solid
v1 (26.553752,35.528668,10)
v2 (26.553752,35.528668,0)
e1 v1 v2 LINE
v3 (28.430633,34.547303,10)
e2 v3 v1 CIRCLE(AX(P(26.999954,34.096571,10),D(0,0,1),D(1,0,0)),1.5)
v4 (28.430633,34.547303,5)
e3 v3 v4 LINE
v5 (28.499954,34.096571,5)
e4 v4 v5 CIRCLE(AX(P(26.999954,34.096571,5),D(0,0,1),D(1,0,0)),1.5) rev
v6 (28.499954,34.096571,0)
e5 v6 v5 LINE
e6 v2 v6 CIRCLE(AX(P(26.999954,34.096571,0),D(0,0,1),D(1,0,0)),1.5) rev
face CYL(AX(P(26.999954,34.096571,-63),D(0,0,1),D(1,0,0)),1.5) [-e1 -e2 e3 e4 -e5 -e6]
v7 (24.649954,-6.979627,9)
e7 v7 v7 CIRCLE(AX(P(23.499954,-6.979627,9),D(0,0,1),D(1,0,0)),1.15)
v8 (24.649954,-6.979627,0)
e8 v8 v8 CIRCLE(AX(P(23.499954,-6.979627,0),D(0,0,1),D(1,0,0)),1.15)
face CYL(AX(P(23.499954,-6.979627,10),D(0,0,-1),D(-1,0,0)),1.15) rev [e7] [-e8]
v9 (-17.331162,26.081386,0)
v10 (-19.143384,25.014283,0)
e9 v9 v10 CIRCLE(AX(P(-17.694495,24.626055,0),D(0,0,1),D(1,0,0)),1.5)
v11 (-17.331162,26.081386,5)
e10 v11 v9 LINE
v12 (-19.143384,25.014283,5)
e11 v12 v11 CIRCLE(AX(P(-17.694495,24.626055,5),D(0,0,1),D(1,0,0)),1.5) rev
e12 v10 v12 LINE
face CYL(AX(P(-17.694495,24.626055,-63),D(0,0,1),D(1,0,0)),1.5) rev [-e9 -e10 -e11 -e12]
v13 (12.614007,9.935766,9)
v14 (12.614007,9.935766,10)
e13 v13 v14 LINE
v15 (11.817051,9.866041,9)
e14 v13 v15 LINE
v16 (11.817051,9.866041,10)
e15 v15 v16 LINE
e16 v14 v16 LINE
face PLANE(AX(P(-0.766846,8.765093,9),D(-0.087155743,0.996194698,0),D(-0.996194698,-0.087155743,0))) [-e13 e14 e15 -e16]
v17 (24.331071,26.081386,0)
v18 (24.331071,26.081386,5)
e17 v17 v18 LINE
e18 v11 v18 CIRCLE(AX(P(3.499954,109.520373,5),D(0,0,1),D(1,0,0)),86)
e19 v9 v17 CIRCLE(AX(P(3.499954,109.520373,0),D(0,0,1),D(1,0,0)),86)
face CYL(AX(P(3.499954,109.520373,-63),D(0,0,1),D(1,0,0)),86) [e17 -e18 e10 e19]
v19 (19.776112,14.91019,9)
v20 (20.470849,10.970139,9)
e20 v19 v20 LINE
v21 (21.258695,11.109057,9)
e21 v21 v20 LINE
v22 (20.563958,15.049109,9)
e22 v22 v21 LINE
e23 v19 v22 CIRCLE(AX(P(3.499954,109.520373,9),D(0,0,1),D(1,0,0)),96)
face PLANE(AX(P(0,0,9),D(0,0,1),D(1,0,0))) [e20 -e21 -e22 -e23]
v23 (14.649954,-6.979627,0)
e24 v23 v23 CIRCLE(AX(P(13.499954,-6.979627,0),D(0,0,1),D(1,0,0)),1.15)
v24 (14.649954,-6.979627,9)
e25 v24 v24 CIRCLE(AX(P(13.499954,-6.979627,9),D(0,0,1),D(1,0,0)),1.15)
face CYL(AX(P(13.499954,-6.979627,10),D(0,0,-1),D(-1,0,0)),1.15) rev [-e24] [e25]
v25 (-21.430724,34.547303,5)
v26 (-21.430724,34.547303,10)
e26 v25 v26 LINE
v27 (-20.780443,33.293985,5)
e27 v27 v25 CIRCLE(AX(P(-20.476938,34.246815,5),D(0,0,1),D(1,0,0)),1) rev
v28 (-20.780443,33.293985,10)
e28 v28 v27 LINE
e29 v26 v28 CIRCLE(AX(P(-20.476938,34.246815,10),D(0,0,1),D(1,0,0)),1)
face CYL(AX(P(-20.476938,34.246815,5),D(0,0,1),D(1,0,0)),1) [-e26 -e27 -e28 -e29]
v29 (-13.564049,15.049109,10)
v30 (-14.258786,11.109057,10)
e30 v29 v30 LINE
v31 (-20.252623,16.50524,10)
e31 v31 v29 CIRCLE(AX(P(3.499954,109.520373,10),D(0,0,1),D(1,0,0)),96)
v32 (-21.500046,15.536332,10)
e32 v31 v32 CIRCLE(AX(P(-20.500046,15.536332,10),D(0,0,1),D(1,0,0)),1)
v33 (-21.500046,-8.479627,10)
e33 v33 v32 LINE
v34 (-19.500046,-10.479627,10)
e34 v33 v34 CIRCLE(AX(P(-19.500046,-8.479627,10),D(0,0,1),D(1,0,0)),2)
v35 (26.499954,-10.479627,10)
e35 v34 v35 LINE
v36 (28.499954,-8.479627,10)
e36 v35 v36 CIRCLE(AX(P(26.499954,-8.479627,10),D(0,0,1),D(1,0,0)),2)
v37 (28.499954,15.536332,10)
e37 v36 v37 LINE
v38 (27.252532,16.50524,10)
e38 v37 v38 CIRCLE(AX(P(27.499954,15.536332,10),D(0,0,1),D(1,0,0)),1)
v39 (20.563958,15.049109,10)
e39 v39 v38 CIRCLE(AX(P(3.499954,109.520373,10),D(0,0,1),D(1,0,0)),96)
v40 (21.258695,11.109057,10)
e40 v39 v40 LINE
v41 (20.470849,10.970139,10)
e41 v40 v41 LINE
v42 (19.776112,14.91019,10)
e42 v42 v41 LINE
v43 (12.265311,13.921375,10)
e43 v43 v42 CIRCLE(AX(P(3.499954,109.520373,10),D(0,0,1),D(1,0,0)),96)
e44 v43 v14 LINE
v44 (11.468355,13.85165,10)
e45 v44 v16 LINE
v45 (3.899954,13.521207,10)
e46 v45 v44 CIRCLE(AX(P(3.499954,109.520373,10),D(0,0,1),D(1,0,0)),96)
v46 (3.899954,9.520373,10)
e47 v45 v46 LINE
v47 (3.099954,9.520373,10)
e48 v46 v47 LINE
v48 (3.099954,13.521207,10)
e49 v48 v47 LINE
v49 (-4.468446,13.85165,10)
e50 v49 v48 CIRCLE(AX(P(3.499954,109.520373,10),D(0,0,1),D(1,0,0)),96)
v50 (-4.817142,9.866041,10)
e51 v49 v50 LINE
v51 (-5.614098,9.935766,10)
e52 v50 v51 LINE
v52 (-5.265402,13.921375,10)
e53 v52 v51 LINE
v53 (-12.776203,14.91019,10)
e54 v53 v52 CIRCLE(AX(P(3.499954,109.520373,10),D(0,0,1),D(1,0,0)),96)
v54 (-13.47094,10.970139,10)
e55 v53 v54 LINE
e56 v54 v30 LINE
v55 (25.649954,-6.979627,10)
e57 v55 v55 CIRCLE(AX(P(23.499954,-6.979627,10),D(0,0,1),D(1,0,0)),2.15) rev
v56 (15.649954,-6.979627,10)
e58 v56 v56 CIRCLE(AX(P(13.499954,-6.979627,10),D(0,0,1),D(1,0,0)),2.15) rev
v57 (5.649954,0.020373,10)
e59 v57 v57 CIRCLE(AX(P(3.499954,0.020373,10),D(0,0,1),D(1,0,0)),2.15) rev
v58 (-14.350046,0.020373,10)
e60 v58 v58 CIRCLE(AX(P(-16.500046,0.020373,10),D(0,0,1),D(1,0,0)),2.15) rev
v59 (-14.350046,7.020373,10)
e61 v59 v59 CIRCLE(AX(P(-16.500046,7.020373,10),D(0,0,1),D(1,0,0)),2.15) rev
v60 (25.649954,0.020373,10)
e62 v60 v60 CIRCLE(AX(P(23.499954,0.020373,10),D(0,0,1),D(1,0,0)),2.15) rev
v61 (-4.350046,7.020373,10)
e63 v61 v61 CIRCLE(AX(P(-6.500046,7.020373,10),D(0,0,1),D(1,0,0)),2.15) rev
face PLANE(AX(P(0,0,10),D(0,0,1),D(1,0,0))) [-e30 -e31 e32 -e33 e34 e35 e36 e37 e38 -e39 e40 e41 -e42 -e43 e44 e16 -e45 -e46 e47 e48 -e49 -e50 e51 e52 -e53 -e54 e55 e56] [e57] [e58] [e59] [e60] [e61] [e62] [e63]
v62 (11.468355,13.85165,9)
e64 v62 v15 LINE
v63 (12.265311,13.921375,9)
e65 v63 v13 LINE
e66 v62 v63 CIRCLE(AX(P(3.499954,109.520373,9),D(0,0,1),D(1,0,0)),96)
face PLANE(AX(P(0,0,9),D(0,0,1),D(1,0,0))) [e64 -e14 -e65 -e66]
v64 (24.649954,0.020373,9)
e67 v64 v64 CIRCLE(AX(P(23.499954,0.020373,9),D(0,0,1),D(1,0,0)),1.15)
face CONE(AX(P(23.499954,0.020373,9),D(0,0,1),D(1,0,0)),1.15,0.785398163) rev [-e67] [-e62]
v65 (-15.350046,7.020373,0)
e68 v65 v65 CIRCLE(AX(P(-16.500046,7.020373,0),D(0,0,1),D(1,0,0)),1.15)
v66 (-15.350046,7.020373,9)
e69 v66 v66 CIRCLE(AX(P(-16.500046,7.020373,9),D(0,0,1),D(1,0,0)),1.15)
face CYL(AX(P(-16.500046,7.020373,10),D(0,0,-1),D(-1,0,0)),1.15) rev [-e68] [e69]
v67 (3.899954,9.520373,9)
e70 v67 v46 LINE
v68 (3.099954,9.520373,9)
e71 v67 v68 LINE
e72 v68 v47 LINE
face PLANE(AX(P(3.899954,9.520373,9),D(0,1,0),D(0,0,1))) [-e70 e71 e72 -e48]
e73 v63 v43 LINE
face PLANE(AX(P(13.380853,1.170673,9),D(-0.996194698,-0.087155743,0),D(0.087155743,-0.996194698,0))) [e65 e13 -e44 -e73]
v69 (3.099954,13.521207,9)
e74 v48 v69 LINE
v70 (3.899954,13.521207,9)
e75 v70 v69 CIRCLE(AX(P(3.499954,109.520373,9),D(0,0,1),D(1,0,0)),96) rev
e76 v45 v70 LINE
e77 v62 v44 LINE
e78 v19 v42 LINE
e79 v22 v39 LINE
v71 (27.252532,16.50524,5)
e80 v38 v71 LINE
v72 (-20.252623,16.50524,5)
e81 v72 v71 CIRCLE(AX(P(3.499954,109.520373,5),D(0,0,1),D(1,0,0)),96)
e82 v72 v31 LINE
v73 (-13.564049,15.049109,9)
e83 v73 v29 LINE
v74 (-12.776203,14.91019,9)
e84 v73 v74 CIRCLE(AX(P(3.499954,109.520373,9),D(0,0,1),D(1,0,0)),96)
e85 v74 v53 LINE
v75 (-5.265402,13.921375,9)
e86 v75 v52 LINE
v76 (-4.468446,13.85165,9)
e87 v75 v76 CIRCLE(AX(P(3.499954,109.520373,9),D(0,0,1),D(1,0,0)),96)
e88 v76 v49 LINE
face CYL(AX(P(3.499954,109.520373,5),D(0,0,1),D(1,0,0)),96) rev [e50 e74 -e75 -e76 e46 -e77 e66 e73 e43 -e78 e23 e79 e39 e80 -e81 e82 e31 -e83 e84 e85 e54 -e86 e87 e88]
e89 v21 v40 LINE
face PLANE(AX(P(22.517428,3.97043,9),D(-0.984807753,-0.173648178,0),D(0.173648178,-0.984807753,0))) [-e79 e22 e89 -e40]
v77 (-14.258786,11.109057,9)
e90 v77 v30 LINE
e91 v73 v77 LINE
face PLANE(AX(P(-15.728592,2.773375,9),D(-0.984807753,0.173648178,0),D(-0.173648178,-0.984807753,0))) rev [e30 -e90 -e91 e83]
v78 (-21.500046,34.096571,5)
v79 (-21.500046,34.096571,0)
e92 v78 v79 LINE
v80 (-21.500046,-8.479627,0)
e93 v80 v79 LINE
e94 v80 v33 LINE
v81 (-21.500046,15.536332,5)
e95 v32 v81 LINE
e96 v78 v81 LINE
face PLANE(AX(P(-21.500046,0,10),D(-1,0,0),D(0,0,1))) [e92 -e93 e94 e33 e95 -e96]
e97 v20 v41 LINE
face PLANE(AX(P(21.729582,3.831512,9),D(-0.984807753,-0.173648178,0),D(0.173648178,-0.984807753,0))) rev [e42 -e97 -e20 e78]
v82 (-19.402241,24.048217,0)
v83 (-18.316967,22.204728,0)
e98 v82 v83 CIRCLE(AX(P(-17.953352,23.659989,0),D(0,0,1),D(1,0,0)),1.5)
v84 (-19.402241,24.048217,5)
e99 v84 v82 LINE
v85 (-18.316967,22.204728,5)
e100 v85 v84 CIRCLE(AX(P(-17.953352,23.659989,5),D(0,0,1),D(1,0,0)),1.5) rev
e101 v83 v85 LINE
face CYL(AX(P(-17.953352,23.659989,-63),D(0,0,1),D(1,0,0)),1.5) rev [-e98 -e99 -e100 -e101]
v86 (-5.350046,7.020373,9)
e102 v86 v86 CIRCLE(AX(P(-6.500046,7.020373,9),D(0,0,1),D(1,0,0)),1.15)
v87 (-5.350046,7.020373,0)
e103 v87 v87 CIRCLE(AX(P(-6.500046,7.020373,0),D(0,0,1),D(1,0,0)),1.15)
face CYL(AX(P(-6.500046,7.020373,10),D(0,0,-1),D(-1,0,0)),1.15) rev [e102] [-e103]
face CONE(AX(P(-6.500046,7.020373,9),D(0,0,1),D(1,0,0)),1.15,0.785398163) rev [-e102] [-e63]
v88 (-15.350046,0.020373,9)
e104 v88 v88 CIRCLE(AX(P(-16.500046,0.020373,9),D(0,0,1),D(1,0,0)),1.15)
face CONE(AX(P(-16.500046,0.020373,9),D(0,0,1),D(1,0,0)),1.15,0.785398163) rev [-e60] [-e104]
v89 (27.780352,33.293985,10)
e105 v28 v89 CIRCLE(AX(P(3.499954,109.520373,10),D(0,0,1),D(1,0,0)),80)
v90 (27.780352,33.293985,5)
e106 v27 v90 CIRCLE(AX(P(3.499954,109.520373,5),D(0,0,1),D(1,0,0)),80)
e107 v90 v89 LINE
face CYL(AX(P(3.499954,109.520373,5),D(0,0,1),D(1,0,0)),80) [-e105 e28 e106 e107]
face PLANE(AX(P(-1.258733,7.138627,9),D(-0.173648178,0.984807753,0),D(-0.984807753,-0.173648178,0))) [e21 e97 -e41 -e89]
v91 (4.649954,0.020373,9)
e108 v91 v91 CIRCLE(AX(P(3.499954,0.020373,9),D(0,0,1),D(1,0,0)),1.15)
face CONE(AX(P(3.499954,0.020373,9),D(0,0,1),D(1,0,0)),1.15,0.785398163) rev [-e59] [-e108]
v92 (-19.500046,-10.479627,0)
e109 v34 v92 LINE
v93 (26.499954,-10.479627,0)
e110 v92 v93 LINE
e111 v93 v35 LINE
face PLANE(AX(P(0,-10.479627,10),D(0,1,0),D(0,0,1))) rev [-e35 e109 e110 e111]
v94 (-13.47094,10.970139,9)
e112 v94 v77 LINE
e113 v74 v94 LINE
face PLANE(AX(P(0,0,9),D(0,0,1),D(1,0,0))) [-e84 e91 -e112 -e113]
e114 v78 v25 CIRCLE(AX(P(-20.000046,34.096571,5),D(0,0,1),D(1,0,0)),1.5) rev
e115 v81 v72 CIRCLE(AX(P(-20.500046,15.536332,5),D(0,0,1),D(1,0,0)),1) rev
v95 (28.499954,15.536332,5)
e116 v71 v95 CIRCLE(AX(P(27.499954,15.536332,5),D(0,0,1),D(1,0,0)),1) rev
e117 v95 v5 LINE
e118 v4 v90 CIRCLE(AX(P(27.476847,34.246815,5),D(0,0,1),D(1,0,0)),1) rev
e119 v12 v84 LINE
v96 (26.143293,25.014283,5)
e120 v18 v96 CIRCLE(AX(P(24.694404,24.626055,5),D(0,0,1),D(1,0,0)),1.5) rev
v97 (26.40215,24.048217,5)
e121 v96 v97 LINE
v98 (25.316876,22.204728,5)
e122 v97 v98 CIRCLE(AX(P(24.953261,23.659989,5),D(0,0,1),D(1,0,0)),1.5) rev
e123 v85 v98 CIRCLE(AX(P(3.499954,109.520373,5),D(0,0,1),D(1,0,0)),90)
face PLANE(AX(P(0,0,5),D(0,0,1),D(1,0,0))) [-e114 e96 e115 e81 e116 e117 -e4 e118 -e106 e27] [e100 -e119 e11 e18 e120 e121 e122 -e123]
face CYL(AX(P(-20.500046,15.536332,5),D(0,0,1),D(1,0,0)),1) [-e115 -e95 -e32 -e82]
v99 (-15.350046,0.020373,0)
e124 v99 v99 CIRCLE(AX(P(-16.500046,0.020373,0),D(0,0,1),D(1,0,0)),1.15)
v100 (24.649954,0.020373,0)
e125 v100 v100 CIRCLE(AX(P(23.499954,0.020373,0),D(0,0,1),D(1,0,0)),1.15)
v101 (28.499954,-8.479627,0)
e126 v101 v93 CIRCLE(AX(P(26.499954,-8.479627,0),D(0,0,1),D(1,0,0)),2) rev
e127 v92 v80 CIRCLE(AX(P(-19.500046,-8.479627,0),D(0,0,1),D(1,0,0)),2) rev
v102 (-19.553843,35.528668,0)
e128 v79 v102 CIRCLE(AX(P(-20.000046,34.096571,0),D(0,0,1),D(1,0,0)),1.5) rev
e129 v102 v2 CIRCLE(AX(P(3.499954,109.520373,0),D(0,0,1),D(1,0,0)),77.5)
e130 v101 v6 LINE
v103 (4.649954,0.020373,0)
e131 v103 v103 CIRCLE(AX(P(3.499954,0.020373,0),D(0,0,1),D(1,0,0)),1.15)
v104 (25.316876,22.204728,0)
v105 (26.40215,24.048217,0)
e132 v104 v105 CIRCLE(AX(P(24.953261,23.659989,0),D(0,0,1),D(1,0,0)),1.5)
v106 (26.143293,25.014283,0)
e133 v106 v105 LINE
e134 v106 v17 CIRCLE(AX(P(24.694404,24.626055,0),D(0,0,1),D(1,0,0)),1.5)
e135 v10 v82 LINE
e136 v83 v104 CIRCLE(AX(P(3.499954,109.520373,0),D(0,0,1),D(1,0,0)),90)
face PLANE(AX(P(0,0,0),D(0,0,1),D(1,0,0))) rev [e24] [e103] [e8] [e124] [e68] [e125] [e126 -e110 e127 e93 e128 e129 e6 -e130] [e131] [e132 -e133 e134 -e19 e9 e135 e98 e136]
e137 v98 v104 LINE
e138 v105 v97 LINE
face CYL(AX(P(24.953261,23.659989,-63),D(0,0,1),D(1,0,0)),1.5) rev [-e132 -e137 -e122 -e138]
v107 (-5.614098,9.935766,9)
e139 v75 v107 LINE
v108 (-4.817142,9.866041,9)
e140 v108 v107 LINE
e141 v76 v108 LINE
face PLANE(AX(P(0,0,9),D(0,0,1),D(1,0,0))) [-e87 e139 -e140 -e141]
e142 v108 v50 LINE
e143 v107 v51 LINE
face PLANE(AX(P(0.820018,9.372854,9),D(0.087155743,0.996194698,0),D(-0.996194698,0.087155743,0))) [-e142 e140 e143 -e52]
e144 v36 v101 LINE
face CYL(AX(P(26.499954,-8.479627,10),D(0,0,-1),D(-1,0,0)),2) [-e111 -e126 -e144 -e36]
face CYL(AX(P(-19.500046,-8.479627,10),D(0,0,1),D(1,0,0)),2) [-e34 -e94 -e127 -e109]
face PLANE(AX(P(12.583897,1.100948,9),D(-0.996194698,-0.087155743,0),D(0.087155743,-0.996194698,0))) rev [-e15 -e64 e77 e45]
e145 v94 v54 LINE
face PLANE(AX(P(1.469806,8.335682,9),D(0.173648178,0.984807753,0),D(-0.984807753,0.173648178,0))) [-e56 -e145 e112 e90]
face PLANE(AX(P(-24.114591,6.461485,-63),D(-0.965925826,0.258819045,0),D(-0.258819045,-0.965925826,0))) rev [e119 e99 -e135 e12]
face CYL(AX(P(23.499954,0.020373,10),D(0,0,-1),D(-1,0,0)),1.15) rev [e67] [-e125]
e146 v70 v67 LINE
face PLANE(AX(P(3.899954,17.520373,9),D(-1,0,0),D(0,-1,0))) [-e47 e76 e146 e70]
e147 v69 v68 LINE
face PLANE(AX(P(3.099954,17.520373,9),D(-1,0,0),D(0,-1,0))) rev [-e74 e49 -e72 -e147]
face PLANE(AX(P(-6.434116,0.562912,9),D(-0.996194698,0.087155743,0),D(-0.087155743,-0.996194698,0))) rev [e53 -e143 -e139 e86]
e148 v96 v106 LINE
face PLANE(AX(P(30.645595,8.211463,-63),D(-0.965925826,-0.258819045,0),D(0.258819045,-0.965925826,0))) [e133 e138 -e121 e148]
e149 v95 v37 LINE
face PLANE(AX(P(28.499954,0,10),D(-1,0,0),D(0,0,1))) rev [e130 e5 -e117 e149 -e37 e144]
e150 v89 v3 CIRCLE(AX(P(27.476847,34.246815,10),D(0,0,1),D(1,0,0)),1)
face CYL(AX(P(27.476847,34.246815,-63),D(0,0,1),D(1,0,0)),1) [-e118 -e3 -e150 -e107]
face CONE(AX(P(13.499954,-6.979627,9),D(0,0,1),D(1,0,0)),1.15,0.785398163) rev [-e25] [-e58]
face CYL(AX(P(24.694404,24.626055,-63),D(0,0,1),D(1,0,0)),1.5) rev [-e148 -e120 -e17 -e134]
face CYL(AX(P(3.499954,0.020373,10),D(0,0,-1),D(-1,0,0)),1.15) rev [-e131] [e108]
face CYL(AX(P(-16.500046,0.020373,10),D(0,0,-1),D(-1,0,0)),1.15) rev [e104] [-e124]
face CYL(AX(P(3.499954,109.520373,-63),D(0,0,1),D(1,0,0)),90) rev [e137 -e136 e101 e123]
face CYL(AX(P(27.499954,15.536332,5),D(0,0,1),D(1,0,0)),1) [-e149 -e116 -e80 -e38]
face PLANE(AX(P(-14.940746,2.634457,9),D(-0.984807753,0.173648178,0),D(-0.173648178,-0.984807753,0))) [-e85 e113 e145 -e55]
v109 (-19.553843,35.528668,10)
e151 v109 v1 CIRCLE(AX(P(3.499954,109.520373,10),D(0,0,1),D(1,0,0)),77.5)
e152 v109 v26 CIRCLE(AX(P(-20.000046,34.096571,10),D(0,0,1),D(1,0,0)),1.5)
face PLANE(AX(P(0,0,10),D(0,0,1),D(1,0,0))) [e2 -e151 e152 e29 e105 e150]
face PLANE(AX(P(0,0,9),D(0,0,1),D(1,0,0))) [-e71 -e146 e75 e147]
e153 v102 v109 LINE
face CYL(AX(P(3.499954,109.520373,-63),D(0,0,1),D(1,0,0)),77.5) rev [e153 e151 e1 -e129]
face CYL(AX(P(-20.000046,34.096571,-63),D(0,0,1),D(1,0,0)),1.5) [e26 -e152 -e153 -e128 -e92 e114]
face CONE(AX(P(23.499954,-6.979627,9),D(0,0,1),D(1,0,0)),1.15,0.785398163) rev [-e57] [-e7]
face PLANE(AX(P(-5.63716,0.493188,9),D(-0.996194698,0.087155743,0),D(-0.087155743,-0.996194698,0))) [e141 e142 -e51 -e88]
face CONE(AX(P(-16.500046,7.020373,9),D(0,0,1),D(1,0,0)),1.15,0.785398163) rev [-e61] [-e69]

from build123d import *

# Parameters (mm, degrees)
SKETCH1_W           = 50
SKETCH1_H           = 21
SKETCH1_R           = 1.15
BOSS_EXTRUDE4_DEPTH = 10
CHAMFER2_SIZE       = 1
FILLET2_R           = 2
SKETCH2_W           = 50
SKETCH2_H           = 10
BOSS_EXTRUDE5_DEPTH = 40
CUT_EXTRUDE1_DEPTH  = 73
CUT_EXTRUDE2_DEPTH  = 5
CUT_EXTRUDE3_DEPTH  = 1
FILLET4_R           = 1.5
FILLET6_R           = 1.5
FILLET7_R           = 1


with BuildPart() as part:
    # Sketch1 → Boss-Extrude4 (new body)
    with BuildSketch(Plane.XY):
        with Locations((3.499954481, 0.020373254)):
            Rectangle(SKETCH1_W, SKETCH1_H)
        with Locations((-16.500045519, 0.020373254)):
            Circle(SKETCH1_R, mode=Mode.SUBTRACT)
        with Locations((13.499954481, -6.979626746)):
            Circle(SKETCH1_R, mode=Mode.SUBTRACT)
        with Locations((23.499954481, -6.979626746)):
            Circle(SKETCH1_R, mode=Mode.SUBTRACT)
        with Locations((-16.500045519, 7.020373254)):
            Circle(SKETCH1_R, mode=Mode.SUBTRACT)
        with Locations((-6.500045519, 7.020373254)):
            Circle(SKETCH1_R, mode=Mode.SUBTRACT)
        with Locations((3.499954481, 0.020373254)):
            Circle(SKETCH1_R, mode=Mode.SUBTRACT)
        with Locations((23.499954481, 0.020373254)):
            Circle(SKETCH1_R, mode=Mode.SUBTRACT)
    extrude(amount=BOSS_EXTRUDE4_DEPTH)

    # Chamfer2
    chamfer2_edges = [part.edges().sort_by_distance(p)[0] for p in [
        (22.349954481, 0.020373254, 10),
        (-17.650045519, 0.020373254, 10),
        (-17.650045519, 7.020373254, 10),
        (-7.650045519, 7.020373254, 10),
        (22.349954481, -6.979626746, 10),
        (12.349954481, -6.979626746, 10),
        (2.349954481, 0.020373254, 10),
    ]]
    chamfer(chamfer2_edges, length=CHAMFER2_SIZE)

    # Fillet2
    fillet2_edges = [part.edges().sort_by_distance(p)[0] for p in [
        (28.499954481, -10.479626746, 5),
        (-21.500045519, -10.479626746, 5),
    ]]
    fillet(fillet2_edges, radius=FILLET2_R)

    # Sketch2 → Boss-Extrude5 (add)
    with BuildSketch(Plane(origin=(0, 10.520373254, 0), x_dir=(1, 0, 0), z_dir=(0, 1, 0))):
        with Locations((3.499954481, -5)):
            Rectangle(SKETCH2_W, SKETCH2_H)
    extrude(amount=BOSS_EXTRUDE5_DEPTH)

    # Sketch4 → Cut-Extrude1 (cut)
    with BuildSketch(Plane.XY.offset(10)):
        with BuildLine():
            Line((26.79366854, 22.587048888), (25.75839236, 26.450752193))
            ThreePointArc((25.75839236, 26.450752193), (3.499954481, 23.520373254), (-18.758483398, 26.450752193))
            Line((-18.758483398, 26.450752193), (-19.793759578, 22.587048888))
            ThreePointArc((-19.793759578, 22.587048888), (3.499954481, 19.520373254), (26.79366854, 22.587048888))
        make_face()
        with BuildLine():
            ThreePointArc((-21.500045519, 36.163369499), (3.499954481, 32.020373254), (28.499954481, 36.163369499))
            Line((28.499954481, 36.163369499), (28.499954481, 50.520373254))
            Line((28.499954481, 50.520373254), (-21.500045519, 50.520373254))
            Line((-21.500045519, 50.520373254), (-21.500045519, 36.163369499))
        make_face()
    extrude(amount=-CUT_EXTRUDE1_DEPTH, mode=Mode.SUBTRACT)

    # Sketch4<3> → Cut-Extrude2 (cut)
    with BuildSketch(Plane.XY.offset(10)):
        with BuildLine():
            Line((28.499954481, 17.764584387), (28.499954481, 23.062290925))
            ThreePointArc((28.499954481, 23.062290925), (27.647980656, 22.820472263), (26.79366854, 22.587048888))
            ThreePointArc((26.79366854, 22.587048888), (3.499954481, 19.520373254), (-19.793759578, 22.587048888))
            ThreePointArc((-19.793759578, 22.587048888), (-20.648071694, 22.820472263), (-21.500045519, 23.062290925))
            Line((-21.500045519, 23.062290925), (-21.500045519, 17.764584387))
            Line((-21.500045519, 17.764584387), (-20.697767999, 20.758724854))
            Line((-20.697767999, 20.758724854), (-19.925027338, 20.551669618))
            Line((-19.925027338, 20.551669618), (-20.960087835, 16.688771254))
            ThreePointArc((-20.960087835, 16.688771254), (-17.278248457, 15.795956571), (-13.564048969, 15.049108913))
            Line((-13.564048969, 15.049108913), (-12.869600966, 18.987519248))
            Line((-12.869600966, 18.987519248), (-12.081754763, 18.848600706))
            Line((-12.081754763, 18.848600706), (-12.776202766, 14.910190371))
            ThreePointArc((-12.776202766, 14.910190371), (-9.030559972, 14.341666562), (-5.265402072, 13.9213747))
            Line((-5.265402072, 13.9213747), (-4.916851731, 17.905323327))
            Line((-4.916851731, 17.905323327), (-4.119895973, 17.835598733))
            Line((-4.119895973, 17.835598733), (-4.468446314, 13.851650106))
            ThreePointArc((-4.468446314, 13.851650106), (-0.687506706, 13.611743982), (3.099954481, 13.521206591))
            Line((3.099954481, 13.521206591), (3.099954481, 17.520373254))
            Line((3.099954481, 17.520373254), (3.899954481, 17.520373254))
            Line((3.899954481, 17.520373254), (3.899954481, 13.521206591))
            ThreePointArc((3.899954481, 13.521206591), (7.687415668, 13.611743982), (11.468355275, 13.851650106))
            Line((11.468355275, 13.851650106), (11.119804934, 17.835598733))
            Line((11.119804934, 17.835598733), (11.916760693, 17.905323327))
            Line((11.916760693, 17.905323327), (12.265311034, 13.9213747))
            ThreePointArc((12.265311034, 13.9213747), (16.030468934, 14.341666562), (19.776111728, 14.910190371))
            Line((19.776111728, 14.910190371), (19.081663725, 18.848600706))
            Line((19.081663725, 18.848600706), (19.869509927, 18.987519248))
            Line((19.869509927, 18.987519248), (20.563957931, 15.049108913))
            ThreePointArc((20.563957931, 15.049108913), (24.278157419, 15.795956571), (27.959996797, 16.688771254))
            Line((27.959996797, 16.688771254), (26.9249363, 20.551669618))
            Line((26.9249363, 20.551669618), (27.697676961, 20.758724854))
            Line((27.697676961, 20.758724854), (28.499954481, 17.764584387))
        make_face()
        with BuildLine():
            ThreePointArc((25.75839236, 26.450752193), (27.132420907, 26.831156723), (28.499954481, 27.234286946))
            Line((28.499954481, 27.234286946), (28.499954481, 33.526952486))
            ThreePointArc((28.499954481, 33.526952486), (3.499954481, 29.520373254), (-21.500045519, 33.526952486))
            Line((-21.500045519, 33.526952486), (-21.500045519, 27.234286946))
            ThreePointArc((-21.500045519, 27.234286946), (-20.132511945, 26.831156723), (-18.758483398, 26.450752193))
            ThreePointArc((-18.758483398, 26.450752193), (3.499954481, 23.520373254), (25.75839236, 26.450752193))
        make_face()
        with BuildLine():
            Line((28.499954481, 23.062290925), (28.499954481, 27.234286946))
            ThreePointArc((28.499954481, 27.234286946), (27.132420907, 26.831156723), (25.75839236, 26.450752193))
            Line((25.75839236, 26.450752193), (26.79366854, 22.587048888))
            ThreePointArc((26.79366854, 22.587048888), (27.647980656, 22.820472263), (28.499954481, 23.062290925))
        make_face()
        with BuildLine():
            ThreePointArc((-18.758483398, 26.450752193), (-20.132511945, 26.831156723), (-21.500045519, 27.234286946))
            Line((-21.500045519, 27.234286946), (-21.500045519, 23.062290925))
            ThreePointArc((-21.500045519, 23.062290925), (-20.648071694, 22.820472263), (-19.793759578, 22.587048888))
            Line((-19.793759578, 22.587048888), (-18.758483398, 26.450752193))
        make_face()
        with BuildLine():
            Line((28.499954481, 16.832725749), (28.499954481, 17.764584387))
            Line((28.499954481, 17.764584387), (27.697676961, 20.758724854))
            Line((27.697676961, 20.758724854), (26.9249363, 20.551669618))
            Line((26.9249363, 20.551669618), (27.959996797, 16.688771254))
            ThreePointArc((27.959996797, 16.688771254), (28.230080384, 16.760355613), (28.499954481, 16.832725749))
        make_face()
        with BuildLine():
            ThreePointArc((19.776111728, 14.910190371), (20.170179537, 14.978828965), (20.563957931, 15.049108913))
            Line((20.563957931, 15.049108913), (19.869509927, 18.987519248))
            Line((19.869509927, 18.987519248), (19.081663725, 18.848600706))
            Line((19.081663725, 18.848600706), (19.776111728, 14.910190371))
        make_face()
        with BuildLine():
            ThreePointArc((11.468355275, 13.851650106), (11.866905785, 13.885682238), (12.265311034, 13.9213747))
            Line((12.265311034, 13.9213747), (11.916760693, 17.905323327))
            Line((11.916760693, 17.905323327), (11.119804934, 17.835598733))
            Line((11.119804934, 17.835598733), (11.468355275, 13.851650106))
        make_face()
        with BuildLine():
            ThreePointArc((3.099954481, 13.521206591), (3.499954481, 13.520373254), (3.899954481, 13.521206591))
            Line((3.899954481, 13.521206591), (3.899954481, 17.520373254))
            Line((3.899954481, 17.520373254), (3.099954481, 17.520373254))
            Line((3.099954481, 17.520373254), (3.099954481, 13.521206591))
        make_face()
        with BuildLine():
            Line((-4.916851731, 17.905323327), (-5.265402072, 13.9213747))
            ThreePointArc((-5.265402072, 13.9213747), (-4.866996823, 13.885682238), (-4.468446314, 13.851650106))
            Line((-4.468446314, 13.851650106), (-4.119895973, 17.835598733))
            Line((-4.119895973, 17.835598733), (-4.916851731, 17.905323327))
        make_face()
        with BuildLine():
            Line((-12.869600966, 18.987519248), (-13.564048969, 15.049108913))
            ThreePointArc((-13.564048969, 15.049108913), (-13.170270575, 14.978828965), (-12.776202766, 14.910190371))
            Line((-12.776202766, 14.910190371), (-12.081754763, 18.848600706))
            Line((-12.081754763, 18.848600706), (-12.869600966, 18.987519248))
        make_face()
        with BuildLine():
            Line((-20.697767999, 20.758724854), (-21.500045519, 17.764584387))
            Line((-21.500045519, 17.764584387), (-21.500045519, 16.832725749))
            ThreePointArc((-21.500045519, 16.832725749), (-21.230171422, 16.760355613), (-20.960087835, 16.688771254))
            Line((-20.960087835, 16.688771254), (-19.925027338, 20.551669618))
            Line((-19.925027338, 20.551669618), (-20.697767999, 20.758724854))
        make_face()
    extrude(amount=-CUT_EXTRUDE2_DEPTH, mode=Mode.SUBTRACT)

    # Sketch4<4> → Cut-Extrude3 (cut)
    with BuildSketch(Plane.XY.offset(10)):
        with BuildLine():
            Line((3.899954481, 9.520373254), (3.899954481, 13.521206591))
            ThreePointArc((3.899954481, 13.521206591), (3.499954481, 13.520373254), (3.099954481, 13.521206591))
            Line((3.099954481, 13.521206591), (3.099954481, 9.520373254))
            Line((3.099954481, 9.520373254), (3.899954481, 9.520373254))
        make_face()
        with BuildLine():
            ThreePointArc((12.265311034, 13.9213747), (11.866905785, 13.885682238), (11.468355275, 13.851650106))
            Line((11.468355275, 13.851650106), (11.817050876, 9.866041148))
            Line((11.817050876, 9.866041148), (12.614006635, 9.935765742))
            Line((12.614006635, 9.935765742), (12.265311034, 13.9213747))
        make_face()
        with BuildLine():
            Line((-4.817141915, 9.866041148), (-4.468446314, 13.851650106))
            ThreePointArc((-4.468446314, 13.851650106), (-4.866996823, 13.885682238), (-5.265402072, 13.9213747))
            Line((-5.265402072, 13.9213747), (-5.614097673, 9.935765742))
            Line((-5.614097673, 9.935765742), (-4.817141915, 9.866041148))
        make_face()
        with BuildLine():
            ThreePointArc((20.563957931, 15.049108913), (20.170179537, 14.978828965), (19.776111728, 14.910190371))
            Line((19.776111728, 14.910190371), (20.470849146, 10.970138682))
            Line((20.470849146, 10.970138682), (21.258695349, 11.109057224))
            Line((21.258695349, 11.109057224), (20.563957931, 15.049108913))
        make_face()
        with BuildLine():
            Line((-13.470940185, 10.970138682), (-12.776202766, 14.910190371))
            ThreePointArc((-12.776202766, 14.910190371), (-13.170270575, 14.978828965), (-13.564048969, 15.049108913))
            Line((-13.564048969, 15.049108913), (-14.258786387, 11.109057224))
            Line((-14.258786387, 11.109057224), (-13.470940185, 10.970138682))
        make_face()
    extrude(amount=-CUT_EXTRUDE3_DEPTH, mode=Mode.SUBTRACT)

    # Fillet4
    fillet4_edges = [part.edges().sort_by_distance(p)[0] for p in [
        (-18.758483398, 26.450752193, 2.5),
        (25.75839236, 26.450752193, 2.5),
        (26.79366854, 22.587048888, 2.5),
        (-19.793759578, 22.587048888, 2.5),
    ]]
    fillet(fillet4_edges, radius=FILLET4_R)

    # Fillet6
    fillet6_edges = [part.edges().sort_by_distance(p)[0] for p in [
        (28.499954481, 36.163369499, 5),
        (-21.500045519, 36.163369499, 5),
    ]]
    fillet(fillet6_edges, radius=FILLET6_R)

    # Fillet7
    # the kernel refuses this fillet: 1 mm, written as the material it takes off along each edge
    with BuildSketch(Plane(origin=(28.499954481, 33.526952486, 12.556756315), x_dir=(-0.0677828444913723, 0.9977000982222356, 0), z_dir=(0, 0, -1))) as fillet7_piece_1:
        with BuildLine():
            CenterArc((0.787555748, -0.971959872), FILLET7_R, 76.399725049, 89.818683939)
            Line((-0.183655122, -0.73373845), (-0.280776209, -0.709916308))
            ThreePointArc((-0.280776209, -0.709916308), (-0.189702109, -0.342371174), (-0.096891518, 0.024739315))
            Line((-0.096891518, 0.024739315), (-0.006778284, 0.09977001))
            ThreePointArc((-0.006778284, 0.09977001), (0.561529809, 0.138380349), (1.046217204, 0.097195987))
            Line((1.046217204, 0.097195987), (1.022702526, 0))
        make_face()
    extrude(amount=7.556756315, mode=Mode.SUBTRACT)
    with BuildSketch(Plane(origin=(28.499954481, 16.832725749, 13.240984234), x_dir=(0, -1, 0), z_dir=(0, 0, -1))) as fillet7_piece_2:
        with BuildLine():
            CenterArc((1.296393694, 1), FILLET7_R, 165.67494806, 104.32505194)
            ThreePointArc((0.327486052, 1.24742268), (0.165837833, 0.62316139), (0, 0))
            Line((0, 0), (1.296393694, 0))
        make_face()
    extrude(amount=8.240984234, mode=Mode.SUBTRACT)
    with BuildSketch(Plane(origin=(-21.500045519, 16.832725749, 13.240984234), x_dir=(0, -1, 0), z_dir=(0, 0, -1))) as fillet7_piece_3:
        with BuildLine():
            CenterArc((1.296393694, -1), FILLET7_R, 90, 104.32505194)
            ThreePointArc((0.327486052, -1.24742268), (0.165837833, -0.62316139), (0, 0))
            Line((0, 0), (1.296393694, 0))
        make_face()
    extrude(amount=8.240984234, mode=Mode.SUBTRACT)
    with BuildSketch(Plane(origin=(-21.500045519, 33.526952486, 12.556756315), x_dir=(0.0677828444913778, 0.9977000982222352, 0), z_dir=(0, 0, -1))) as fillet7_piece_4:
        with BuildLine():
            CenterArc((0.787555748, 0.971959872), FILLET7_R, 193.781591011, 89.818683939)
            Line((-0.183655122, 0.73373845), (-0.280776209, 0.709916308))
            ThreePointArc((-0.280776209, 0.709916308), (-0.189702109, 0.342371174), (-0.096891518, -0.024739315))
            Line((-0.096891518, -0.024739315), (-0.006778284, -0.09977001))
            ThreePointArc((-0.006778284, -0.09977001), (0.561529809, -0.138380349), (1.046217204, -0.097195987))
            Line((1.046217204, -0.097195987), (1.022702526, 0))
        make_face()
    extrude(amount=7.556756315, mode=Mode.SUBTRACT)


solid = part.part
